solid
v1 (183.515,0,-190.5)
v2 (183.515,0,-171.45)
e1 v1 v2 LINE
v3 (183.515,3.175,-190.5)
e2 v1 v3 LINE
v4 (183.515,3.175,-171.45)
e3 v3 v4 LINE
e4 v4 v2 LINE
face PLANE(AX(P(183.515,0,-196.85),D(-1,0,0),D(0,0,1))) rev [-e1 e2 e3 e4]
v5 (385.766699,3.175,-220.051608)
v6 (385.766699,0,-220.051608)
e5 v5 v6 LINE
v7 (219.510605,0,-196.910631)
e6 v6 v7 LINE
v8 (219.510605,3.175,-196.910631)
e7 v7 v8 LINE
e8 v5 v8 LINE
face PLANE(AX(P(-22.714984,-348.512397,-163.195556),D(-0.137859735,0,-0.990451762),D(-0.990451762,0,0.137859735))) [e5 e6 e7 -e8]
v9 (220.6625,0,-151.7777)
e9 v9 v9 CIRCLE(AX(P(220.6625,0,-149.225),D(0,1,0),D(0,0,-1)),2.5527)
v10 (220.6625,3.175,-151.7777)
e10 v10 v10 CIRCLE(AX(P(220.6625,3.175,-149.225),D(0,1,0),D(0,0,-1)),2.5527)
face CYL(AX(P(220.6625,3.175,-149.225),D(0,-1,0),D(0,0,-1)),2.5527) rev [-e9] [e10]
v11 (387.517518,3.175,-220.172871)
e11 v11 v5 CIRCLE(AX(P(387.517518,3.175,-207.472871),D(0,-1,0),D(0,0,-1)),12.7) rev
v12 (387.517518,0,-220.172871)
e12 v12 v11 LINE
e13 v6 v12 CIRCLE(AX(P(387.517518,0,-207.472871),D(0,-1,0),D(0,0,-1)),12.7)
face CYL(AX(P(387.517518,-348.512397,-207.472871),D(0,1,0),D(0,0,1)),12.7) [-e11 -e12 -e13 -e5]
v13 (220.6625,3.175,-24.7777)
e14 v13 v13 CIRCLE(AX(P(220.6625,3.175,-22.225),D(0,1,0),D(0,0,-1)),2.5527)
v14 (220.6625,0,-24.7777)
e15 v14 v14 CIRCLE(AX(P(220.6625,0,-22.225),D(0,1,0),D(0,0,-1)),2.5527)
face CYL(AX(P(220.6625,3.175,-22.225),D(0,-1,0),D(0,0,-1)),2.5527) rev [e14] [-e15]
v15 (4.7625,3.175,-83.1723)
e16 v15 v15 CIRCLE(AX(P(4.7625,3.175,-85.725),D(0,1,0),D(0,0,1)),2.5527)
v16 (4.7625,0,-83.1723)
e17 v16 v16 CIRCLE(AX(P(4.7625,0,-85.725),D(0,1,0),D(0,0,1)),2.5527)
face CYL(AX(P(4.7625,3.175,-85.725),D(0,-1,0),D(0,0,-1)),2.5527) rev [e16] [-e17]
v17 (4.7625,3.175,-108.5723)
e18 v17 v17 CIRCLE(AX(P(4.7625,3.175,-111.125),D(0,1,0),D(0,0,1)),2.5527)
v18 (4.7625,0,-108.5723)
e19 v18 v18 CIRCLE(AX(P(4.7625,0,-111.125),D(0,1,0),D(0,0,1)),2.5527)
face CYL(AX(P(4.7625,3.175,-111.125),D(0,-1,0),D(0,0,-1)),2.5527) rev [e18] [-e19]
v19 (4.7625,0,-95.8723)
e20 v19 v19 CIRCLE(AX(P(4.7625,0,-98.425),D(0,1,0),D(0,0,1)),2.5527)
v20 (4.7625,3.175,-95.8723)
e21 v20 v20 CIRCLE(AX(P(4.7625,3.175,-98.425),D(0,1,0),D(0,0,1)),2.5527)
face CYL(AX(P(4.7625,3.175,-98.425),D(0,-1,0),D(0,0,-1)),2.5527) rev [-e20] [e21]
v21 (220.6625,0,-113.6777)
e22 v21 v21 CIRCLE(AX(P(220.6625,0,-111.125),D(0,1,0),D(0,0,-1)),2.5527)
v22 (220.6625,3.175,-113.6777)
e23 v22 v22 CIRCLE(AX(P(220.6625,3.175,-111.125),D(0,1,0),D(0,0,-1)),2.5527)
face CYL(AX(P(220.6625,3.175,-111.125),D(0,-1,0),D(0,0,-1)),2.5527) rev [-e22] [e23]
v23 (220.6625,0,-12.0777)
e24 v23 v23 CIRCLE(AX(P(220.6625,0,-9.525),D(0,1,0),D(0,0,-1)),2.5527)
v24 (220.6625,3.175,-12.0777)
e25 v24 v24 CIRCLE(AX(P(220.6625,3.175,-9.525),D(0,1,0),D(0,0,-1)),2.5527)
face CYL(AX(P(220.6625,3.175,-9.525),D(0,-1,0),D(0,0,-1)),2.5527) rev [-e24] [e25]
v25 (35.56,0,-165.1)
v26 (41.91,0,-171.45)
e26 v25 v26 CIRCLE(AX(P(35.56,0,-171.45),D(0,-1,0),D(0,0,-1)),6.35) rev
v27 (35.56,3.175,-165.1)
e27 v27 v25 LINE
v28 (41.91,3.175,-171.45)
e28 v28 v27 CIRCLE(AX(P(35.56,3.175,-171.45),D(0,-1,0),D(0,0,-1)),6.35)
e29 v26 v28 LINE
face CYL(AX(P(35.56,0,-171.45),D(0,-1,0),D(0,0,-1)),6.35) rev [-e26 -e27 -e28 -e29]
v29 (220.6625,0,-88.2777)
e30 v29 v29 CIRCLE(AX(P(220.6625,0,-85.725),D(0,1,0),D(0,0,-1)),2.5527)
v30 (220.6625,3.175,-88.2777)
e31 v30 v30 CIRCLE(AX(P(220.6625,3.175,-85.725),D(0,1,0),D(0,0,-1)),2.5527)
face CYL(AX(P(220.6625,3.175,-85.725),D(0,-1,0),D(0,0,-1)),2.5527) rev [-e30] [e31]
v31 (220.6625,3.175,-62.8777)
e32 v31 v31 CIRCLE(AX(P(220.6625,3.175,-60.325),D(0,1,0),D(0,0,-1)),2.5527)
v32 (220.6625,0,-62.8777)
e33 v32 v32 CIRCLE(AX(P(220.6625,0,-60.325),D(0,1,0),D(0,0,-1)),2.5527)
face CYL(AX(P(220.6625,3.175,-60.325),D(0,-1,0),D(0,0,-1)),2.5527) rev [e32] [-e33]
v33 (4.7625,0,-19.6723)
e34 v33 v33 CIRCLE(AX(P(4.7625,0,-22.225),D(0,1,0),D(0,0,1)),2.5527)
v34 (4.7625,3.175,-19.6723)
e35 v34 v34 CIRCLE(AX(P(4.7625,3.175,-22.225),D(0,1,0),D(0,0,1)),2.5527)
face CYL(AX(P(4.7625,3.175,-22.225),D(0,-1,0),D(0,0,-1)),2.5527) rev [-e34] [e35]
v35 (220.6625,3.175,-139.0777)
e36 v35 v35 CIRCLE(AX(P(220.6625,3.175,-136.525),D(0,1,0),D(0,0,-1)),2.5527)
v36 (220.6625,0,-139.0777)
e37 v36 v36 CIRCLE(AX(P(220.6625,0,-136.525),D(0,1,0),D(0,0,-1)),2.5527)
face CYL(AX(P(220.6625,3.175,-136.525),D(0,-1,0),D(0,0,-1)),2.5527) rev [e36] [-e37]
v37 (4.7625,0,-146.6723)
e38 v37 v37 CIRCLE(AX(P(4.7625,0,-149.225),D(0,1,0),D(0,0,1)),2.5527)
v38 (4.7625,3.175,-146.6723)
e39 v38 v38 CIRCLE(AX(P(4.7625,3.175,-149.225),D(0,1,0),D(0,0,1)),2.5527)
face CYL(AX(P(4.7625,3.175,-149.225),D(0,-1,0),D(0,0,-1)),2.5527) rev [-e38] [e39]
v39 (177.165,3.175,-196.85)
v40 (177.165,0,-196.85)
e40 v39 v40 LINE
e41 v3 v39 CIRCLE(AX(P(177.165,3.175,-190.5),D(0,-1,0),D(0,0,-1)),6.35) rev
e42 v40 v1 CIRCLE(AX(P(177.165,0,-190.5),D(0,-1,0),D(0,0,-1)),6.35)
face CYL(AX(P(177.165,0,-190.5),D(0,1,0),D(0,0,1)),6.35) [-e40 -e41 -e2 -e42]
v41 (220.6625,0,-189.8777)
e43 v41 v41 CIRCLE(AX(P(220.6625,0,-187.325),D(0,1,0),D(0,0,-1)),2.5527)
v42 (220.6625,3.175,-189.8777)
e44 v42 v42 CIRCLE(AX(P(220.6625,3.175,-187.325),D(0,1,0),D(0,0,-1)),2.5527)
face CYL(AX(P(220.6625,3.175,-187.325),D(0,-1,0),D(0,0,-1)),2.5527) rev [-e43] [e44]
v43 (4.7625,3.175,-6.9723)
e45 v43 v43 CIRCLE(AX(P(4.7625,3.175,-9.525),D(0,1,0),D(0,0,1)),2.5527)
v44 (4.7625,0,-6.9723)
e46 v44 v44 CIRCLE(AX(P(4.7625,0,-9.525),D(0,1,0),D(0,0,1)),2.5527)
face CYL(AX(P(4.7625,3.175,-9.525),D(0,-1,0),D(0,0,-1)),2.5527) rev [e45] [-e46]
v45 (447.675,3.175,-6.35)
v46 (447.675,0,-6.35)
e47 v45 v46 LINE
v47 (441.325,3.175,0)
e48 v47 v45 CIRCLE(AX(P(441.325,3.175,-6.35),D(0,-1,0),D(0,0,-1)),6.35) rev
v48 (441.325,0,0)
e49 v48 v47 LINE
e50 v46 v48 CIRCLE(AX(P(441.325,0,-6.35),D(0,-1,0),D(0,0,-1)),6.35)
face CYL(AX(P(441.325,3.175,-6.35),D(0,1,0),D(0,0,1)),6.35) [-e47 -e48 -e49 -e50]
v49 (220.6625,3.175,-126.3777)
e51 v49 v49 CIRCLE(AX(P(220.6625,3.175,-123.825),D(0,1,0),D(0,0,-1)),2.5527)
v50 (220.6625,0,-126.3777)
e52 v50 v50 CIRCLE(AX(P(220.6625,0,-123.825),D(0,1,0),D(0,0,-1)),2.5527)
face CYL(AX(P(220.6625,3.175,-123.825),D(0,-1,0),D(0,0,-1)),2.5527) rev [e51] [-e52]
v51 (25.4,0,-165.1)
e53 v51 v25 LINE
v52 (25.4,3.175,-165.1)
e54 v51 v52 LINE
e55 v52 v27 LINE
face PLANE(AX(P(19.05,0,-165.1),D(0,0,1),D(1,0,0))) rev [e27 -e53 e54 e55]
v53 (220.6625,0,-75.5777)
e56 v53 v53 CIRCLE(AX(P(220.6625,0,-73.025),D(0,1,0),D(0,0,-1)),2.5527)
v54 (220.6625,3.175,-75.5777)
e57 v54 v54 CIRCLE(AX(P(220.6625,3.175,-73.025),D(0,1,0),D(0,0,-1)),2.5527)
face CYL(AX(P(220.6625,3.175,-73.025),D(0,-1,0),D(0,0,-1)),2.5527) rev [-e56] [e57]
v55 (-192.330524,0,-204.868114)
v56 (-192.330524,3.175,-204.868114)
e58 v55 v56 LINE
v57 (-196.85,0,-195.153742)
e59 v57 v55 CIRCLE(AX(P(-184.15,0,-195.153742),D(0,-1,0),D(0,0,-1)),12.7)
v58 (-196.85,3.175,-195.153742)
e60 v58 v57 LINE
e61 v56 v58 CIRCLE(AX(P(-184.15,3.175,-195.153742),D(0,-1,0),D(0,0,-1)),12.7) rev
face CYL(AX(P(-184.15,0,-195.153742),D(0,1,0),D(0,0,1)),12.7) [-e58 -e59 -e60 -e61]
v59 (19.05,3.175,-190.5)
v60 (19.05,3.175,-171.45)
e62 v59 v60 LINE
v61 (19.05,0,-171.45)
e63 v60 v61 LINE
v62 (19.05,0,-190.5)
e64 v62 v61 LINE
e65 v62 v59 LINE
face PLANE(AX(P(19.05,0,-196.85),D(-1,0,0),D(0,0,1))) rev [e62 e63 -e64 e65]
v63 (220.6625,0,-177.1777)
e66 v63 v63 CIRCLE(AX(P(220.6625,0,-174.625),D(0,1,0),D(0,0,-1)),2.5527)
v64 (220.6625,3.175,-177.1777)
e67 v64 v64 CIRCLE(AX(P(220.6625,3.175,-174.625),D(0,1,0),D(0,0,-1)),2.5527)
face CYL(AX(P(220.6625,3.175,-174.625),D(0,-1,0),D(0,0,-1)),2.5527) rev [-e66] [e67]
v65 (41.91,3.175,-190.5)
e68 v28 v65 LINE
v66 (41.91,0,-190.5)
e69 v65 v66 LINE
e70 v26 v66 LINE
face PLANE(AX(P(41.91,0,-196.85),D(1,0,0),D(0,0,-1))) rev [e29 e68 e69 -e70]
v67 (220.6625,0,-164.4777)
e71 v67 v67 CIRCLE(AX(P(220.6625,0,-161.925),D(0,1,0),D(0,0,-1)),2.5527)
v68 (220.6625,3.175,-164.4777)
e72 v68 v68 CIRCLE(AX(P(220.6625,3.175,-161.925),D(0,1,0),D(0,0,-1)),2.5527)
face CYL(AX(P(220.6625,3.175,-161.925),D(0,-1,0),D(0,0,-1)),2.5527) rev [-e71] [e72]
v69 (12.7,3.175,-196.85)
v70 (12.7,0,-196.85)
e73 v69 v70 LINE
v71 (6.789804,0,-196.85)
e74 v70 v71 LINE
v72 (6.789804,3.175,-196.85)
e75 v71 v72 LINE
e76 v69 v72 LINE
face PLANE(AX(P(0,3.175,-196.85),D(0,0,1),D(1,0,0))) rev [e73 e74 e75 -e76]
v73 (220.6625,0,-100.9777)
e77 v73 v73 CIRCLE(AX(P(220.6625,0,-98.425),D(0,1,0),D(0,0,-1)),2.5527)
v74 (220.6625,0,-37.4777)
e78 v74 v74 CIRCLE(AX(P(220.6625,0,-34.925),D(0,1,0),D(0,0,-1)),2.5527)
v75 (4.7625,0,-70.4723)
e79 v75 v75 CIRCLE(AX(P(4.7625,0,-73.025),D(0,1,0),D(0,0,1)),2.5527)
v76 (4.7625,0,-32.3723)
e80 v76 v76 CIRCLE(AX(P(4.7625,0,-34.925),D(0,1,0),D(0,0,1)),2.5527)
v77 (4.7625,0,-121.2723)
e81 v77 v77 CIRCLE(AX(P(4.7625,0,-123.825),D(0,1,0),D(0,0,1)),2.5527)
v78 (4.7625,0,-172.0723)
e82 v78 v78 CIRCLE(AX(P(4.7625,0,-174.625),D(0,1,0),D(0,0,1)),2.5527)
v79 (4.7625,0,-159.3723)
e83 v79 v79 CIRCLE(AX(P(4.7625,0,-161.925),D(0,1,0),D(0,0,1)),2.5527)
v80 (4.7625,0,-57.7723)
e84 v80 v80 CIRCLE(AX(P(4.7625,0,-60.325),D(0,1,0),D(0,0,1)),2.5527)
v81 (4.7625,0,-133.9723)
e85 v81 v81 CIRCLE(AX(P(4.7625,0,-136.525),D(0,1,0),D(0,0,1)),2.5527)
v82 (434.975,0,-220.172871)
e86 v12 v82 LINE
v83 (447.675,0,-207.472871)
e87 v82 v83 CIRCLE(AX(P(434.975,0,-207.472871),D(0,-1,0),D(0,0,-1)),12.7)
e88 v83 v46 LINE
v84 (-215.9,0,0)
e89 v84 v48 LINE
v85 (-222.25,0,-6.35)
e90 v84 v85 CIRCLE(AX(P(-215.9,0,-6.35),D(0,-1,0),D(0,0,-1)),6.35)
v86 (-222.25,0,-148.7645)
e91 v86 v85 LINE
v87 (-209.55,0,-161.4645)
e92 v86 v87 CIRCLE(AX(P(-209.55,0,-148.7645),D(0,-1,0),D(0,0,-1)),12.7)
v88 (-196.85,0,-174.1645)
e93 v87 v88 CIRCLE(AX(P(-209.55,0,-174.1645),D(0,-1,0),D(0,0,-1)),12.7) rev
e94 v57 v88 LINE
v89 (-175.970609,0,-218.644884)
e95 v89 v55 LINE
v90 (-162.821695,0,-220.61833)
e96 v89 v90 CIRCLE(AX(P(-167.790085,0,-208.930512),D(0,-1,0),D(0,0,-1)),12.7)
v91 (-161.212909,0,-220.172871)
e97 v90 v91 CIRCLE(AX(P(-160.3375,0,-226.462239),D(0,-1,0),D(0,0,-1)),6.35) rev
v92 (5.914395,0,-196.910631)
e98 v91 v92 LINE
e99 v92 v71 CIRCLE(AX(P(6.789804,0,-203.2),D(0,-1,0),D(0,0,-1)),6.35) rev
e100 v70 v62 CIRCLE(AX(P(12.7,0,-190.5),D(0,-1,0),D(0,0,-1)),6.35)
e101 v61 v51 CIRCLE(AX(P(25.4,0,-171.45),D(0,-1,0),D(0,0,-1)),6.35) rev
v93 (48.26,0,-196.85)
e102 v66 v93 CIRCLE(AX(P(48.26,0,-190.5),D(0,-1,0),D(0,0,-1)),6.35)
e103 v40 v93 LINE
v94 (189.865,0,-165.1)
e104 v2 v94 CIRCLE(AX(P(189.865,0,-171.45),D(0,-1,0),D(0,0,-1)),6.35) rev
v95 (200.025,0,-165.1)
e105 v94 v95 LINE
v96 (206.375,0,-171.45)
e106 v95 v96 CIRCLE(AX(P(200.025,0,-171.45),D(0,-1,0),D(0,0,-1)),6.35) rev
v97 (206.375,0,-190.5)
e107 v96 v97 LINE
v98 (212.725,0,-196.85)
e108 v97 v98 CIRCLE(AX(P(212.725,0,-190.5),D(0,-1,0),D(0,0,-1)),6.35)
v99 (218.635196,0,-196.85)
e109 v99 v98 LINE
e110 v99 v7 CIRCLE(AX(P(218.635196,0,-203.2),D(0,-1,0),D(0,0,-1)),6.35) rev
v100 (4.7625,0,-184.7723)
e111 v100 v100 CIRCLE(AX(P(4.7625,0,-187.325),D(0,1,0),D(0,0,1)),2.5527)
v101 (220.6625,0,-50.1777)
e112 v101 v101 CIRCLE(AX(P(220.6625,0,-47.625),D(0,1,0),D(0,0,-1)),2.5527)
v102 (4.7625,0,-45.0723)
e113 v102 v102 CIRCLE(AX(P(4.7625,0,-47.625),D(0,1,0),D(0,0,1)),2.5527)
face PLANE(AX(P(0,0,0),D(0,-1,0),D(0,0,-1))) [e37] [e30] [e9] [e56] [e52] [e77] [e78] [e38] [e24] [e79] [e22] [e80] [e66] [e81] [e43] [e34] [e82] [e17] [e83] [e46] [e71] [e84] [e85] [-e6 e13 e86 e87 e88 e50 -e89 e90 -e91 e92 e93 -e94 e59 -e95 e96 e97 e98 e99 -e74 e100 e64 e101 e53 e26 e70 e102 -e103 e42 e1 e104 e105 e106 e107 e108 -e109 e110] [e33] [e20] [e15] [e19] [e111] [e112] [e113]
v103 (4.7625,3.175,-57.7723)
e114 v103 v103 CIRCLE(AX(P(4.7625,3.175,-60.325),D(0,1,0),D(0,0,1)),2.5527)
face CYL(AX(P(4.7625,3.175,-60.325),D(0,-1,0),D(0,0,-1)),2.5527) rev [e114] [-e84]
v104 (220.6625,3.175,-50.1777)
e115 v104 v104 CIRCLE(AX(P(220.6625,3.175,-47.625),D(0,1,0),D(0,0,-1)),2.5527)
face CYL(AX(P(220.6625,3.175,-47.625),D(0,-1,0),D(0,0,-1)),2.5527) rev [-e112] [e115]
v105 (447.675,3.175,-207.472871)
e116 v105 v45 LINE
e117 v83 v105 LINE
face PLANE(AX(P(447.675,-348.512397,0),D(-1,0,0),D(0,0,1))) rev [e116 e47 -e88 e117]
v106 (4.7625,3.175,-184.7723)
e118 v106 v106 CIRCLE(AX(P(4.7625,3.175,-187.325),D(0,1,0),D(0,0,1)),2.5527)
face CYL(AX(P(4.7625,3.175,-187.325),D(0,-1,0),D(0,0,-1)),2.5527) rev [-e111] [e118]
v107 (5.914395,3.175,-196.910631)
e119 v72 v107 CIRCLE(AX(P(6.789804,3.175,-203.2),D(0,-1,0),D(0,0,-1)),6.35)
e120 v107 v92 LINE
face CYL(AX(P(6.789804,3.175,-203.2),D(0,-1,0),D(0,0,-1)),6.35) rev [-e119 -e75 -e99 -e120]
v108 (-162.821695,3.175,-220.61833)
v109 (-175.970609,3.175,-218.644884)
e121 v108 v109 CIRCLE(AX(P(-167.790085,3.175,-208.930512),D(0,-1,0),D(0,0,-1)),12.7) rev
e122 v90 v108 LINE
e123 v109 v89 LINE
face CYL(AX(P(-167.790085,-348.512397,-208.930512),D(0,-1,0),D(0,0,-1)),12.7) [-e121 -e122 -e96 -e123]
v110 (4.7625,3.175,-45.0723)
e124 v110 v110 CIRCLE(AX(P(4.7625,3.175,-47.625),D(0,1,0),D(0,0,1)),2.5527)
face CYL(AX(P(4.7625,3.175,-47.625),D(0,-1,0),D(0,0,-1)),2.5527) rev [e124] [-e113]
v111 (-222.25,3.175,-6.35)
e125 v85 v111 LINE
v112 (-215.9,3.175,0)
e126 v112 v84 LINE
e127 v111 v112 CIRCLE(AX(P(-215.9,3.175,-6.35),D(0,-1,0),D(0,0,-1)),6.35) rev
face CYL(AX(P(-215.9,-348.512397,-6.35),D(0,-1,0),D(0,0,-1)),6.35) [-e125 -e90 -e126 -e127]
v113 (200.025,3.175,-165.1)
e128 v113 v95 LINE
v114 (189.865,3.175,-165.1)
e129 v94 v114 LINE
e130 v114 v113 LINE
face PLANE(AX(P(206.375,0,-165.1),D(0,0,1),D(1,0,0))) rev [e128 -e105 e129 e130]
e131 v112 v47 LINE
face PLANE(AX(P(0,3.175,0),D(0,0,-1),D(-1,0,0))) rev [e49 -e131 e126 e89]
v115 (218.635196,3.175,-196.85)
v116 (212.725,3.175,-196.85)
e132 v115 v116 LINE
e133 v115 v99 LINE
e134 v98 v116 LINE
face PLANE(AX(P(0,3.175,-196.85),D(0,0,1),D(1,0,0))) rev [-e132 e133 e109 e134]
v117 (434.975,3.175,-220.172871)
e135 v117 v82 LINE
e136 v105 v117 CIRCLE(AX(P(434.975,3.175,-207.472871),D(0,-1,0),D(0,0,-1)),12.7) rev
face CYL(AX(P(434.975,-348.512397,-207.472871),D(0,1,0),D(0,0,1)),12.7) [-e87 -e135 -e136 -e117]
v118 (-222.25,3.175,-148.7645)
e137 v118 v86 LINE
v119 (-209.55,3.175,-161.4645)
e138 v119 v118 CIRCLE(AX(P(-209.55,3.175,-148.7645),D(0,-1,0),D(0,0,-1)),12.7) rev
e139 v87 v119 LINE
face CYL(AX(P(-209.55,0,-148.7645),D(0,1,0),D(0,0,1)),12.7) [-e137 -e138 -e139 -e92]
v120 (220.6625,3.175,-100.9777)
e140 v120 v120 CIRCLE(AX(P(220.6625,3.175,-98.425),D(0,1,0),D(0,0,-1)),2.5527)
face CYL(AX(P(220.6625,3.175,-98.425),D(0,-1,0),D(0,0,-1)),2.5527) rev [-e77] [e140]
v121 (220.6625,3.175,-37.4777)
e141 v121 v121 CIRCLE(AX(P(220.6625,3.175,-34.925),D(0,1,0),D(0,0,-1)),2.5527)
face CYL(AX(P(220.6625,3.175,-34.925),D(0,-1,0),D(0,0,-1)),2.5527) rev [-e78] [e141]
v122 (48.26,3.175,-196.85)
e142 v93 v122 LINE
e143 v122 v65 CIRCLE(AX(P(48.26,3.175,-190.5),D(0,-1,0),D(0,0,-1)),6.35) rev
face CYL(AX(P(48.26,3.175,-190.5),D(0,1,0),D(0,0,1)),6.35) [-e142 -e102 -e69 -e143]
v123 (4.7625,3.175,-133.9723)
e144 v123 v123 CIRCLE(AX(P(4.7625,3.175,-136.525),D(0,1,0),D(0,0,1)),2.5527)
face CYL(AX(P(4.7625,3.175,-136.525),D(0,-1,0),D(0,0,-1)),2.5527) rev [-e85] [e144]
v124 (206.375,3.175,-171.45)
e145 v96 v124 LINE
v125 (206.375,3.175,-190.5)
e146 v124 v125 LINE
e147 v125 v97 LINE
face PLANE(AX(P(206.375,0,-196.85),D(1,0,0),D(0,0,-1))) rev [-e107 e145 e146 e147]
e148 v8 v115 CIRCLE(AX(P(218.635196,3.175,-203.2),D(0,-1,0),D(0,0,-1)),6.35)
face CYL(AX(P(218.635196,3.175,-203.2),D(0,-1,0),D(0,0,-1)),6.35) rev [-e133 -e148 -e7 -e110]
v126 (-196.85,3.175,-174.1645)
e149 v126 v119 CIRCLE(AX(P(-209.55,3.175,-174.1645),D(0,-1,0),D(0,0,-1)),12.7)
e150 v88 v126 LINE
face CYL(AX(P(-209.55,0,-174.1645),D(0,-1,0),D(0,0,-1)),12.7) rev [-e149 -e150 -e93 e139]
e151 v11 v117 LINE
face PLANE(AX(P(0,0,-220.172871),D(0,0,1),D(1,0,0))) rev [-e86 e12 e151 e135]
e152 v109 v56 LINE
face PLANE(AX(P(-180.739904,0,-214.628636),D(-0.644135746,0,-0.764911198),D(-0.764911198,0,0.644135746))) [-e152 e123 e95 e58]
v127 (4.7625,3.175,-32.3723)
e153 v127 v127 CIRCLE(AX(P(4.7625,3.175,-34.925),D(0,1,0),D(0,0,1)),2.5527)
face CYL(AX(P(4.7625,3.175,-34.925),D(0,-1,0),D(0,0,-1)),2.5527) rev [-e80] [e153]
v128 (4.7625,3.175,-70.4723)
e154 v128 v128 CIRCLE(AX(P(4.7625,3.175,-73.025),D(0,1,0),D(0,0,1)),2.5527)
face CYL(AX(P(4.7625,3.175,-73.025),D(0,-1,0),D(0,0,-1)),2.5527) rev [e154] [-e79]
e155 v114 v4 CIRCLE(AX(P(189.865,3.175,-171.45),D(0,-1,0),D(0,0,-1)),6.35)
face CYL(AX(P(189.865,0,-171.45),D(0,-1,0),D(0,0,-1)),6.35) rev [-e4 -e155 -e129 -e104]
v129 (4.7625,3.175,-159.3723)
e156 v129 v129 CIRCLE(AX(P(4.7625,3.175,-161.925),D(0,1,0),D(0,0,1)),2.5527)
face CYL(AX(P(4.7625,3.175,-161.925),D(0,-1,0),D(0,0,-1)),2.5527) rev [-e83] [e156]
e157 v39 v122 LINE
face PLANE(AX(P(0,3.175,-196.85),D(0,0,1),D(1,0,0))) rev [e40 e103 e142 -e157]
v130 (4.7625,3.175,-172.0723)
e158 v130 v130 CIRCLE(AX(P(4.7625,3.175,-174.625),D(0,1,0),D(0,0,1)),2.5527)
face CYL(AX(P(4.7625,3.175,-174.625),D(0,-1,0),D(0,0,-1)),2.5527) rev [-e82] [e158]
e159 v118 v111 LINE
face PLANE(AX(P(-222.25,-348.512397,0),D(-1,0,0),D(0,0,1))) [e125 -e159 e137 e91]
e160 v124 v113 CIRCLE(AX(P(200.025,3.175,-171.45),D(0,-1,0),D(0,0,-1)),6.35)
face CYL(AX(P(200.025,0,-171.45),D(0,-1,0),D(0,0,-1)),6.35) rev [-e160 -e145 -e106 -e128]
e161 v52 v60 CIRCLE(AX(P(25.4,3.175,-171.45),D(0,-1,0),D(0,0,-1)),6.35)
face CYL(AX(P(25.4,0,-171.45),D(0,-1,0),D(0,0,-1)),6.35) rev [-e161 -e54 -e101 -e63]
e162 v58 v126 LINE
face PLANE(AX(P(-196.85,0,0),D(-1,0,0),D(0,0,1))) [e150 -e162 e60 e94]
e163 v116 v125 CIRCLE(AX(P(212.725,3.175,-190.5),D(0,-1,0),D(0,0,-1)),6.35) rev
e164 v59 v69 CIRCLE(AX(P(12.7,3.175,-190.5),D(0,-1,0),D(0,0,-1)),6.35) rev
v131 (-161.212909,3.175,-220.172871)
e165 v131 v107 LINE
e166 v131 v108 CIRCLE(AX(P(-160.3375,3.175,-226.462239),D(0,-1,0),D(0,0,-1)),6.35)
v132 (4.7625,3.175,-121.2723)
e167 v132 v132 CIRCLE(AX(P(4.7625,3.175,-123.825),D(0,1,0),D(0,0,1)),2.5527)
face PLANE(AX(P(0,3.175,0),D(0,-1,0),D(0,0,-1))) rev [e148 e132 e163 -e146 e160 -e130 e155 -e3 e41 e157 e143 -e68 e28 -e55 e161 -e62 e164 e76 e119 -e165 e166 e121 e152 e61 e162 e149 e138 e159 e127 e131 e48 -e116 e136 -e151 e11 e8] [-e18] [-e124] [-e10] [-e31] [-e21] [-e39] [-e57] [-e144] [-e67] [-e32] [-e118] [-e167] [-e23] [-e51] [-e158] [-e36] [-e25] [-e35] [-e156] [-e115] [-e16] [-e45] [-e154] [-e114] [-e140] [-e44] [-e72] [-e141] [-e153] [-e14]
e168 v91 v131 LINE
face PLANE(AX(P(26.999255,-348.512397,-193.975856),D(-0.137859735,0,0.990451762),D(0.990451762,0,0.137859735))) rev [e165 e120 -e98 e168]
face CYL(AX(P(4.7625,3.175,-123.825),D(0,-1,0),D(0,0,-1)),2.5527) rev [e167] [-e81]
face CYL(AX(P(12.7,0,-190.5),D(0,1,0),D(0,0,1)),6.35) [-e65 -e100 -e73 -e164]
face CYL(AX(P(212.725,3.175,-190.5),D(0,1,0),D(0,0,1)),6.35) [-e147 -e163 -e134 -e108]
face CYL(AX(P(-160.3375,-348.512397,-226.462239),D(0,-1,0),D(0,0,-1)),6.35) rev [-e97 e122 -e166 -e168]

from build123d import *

# Parameters (mm, degrees)
SKETCH1_W           = 225.425
SKETCH1_H           = 196.85
SKETCH1_R           = 2.5527
BOSS_EXTRUDE1_DEPTH = 3.175
FILLET1_R           = 6.35
SKETCH2_W           = 22.86
SKETCH2_H           = 31.75
CUT_EXTRUDE1_DEPTH  = 300.293223695
FILLET2_R           = 6.35
BOSS_EXTRUDE2_DEPTH = 3.175
FILLET3_R           = 6.35
SKETCH4_R           = 2.4892
CUT_EXTRUDE2_DEPTH  = 520.25515638
CUT_EXTRUDE3_DEPTH  = 520.25515638
FILLET4_R           = 12.7
FILLET5_R           = 12.7
CUT_EXTRUDE4_DEPTH  = 520.25515638
FILLET6_R           = 12.7


with BuildPart() as part:
    # Sketch1 → Boss-Extrude1 (new body)
    with BuildSketch(Plane(origin=(0, 0, 0), x_dir=(1, 0, 0), z_dir=(0, 1, 0))):
        with Locations((112.7125, 98.425)):
            Rectangle(SKETCH1_W, SKETCH1_H)
        with Locations(Location((4.7625, 187.325, 0), (0, 0, 270))):
            Circle(SKETCH1_R, mode=Mode.SUBTRACT)
        with Locations(Location((4.7625, 174.625, 0), (0, 0, 270))):
            Circle(SKETCH1_R, mode=Mode.SUBTRACT)
        with Locations(Location((4.7625, 161.925, 0), (0, 0, 270))):
            Circle(SKETCH1_R, mode=Mode.SUBTRACT)
        with Locations(Location((4.7625, 149.225, 0), (0, 0, 270))):
            Circle(SKETCH1_R, mode=Mode.SUBTRACT)
        with Locations(Location((4.7625, 136.525, 0), (0, 0, 270))):
            Circle(SKETCH1_R, mode=Mode.SUBTRACT)
        with Locations(Location((4.7625, 123.825, 0), (0, 0, 270))):
            Circle(SKETCH1_R, mode=Mode.SUBTRACT)
        with Locations(Location((220.6625, 123.825, 0), (0, 0, 90))):
            Circle(SKETCH1_R, mode=Mode.SUBTRACT)
        with Locations(Location((220.6625, 136.525, 0), (0, 0, 90))):
            Circle(SKETCH1_R, mode=Mode.SUBTRACT)
        with Locations(Location((220.6625, 149.225, 0), (0, 0, 90))):
            Circle(SKETCH1_R, mode=Mode.SUBTRACT)
        with Locations(Location((220.6625, 161.925, 0), (0, 0, 90))):
            Circle(SKETCH1_R, mode=Mode.SUBTRACT)
        with Locations(Location((220.6625, 174.625, 0), (0, 0, 90))):
            Circle(SKETCH1_R, mode=Mode.SUBTRACT)
        with Locations(Location((220.6625, 187.325, 0), (0, 0, 90))):
            Circle(SKETCH1_R, mode=Mode.SUBTRACT)
        with Locations(Location((4.7625, 111.125, 0), (0, 0, 270))):
            Circle(SKETCH1_R, mode=Mode.SUBTRACT)
        with Locations(Location((4.7625, 98.425, 0), (0, 0, 270))):
            Circle(SKETCH1_R, mode=Mode.SUBTRACT)
        with Locations(Location((4.7625, 85.725, 0), (0, 0, 270))):
            Circle(SKETCH1_R, mode=Mode.SUBTRACT)
        with Locations(Location((4.7625, 73.025, 0), (0, 0, 270))):
            Circle(SKETCH1_R, mode=Mode.SUBTRACT)
        with Locations(Location((4.7625, 60.325, 0), (0, 0, 270))):
            Circle(SKETCH1_R, mode=Mode.SUBTRACT)
        with Locations(Location((4.7625, 47.625, 0), (0, 0, 270))):
            Circle(SKETCH1_R, mode=Mode.SUBTRACT)
        with Locations(Location((4.7625, 34.925, 0), (0, 0, 270))):
            Circle(SKETCH1_R, mode=Mode.SUBTRACT)
        with Locations(Location((4.7625, 22.225, 0), (0, 0, 270))):
            Circle(SKETCH1_R, mode=Mode.SUBTRACT)
        with Locations(Location((4.7625, 9.525, 0), (0, 0, 270))):
            Circle(SKETCH1_R, mode=Mode.SUBTRACT)
        with Locations(Location((220.6625, 111.125, 0), (0, 0, 90))):
            Circle(SKETCH1_R, mode=Mode.SUBTRACT)
        with Locations(Location((220.6625, 98.425, 0), (0, 0, 90))):
            Circle(SKETCH1_R, mode=Mode.SUBTRACT)
        with Locations(Location((220.6625, 85.725, 0), (0, 0, 90))):
            Circle(SKETCH1_R, mode=Mode.SUBTRACT)
        with Locations(Location((220.6625, 73.025, 0), (0, 0, 90))):
            Circle(SKETCH1_R, mode=Mode.SUBTRACT)
        with Locations(Location((220.6625, 60.325, 0), (0, 0, 90))):
            Circle(SKETCH1_R, mode=Mode.SUBTRACT)
        with Locations(Location((220.6625, 47.625, 0), (0, 0, 90))):
            Circle(SKETCH1_R, mode=Mode.SUBTRACT)
        with Locations(Location((220.6625, 34.925, 0), (0, 0, 90))):
            Circle(SKETCH1_R, mode=Mode.SUBTRACT)
        with Locations(Location((220.6625, 22.225, 0), (0, 0, 90))):
            Circle(SKETCH1_R, mode=Mode.SUBTRACT)
        with Locations(Location((220.6625, 9.525, 0), (0, 0, 90))):
            Circle(SKETCH1_R, mode=Mode.SUBTRACT)
    extrude(amount=BOSS_EXTRUDE1_DEPTH)

    # Fillet1
    fillet1_edges = [part.edges().sort_by_distance(p)[0] for p in [
        (0, 1.5875, -196.85),
        (225.425, 1.5875, -196.85),
        (225.425, 1.5875, 0),
        (0, 1.5875, 0),
    ]]
    fillet(fillet1_edges, radius=FILLET1_R)

    # Sketch2 → Cut-Extrude1 (cut, through all)
    with BuildSketch(Plane(origin=(0, 3.175, 0), x_dir=(1, 0, 0), z_dir=(0, 1, 0))):
        with Locations((30.48, 180.975)):
            Rectangle(SKETCH2_W, SKETCH2_H)
        with Locations((194.945, 180.975)):
            Rectangle(SKETCH2_W, SKETCH2_H)
    extrude(amount=-CUT_EXTRUDE1_DEPTH, mode=Mode.SUBTRACT)

    # Fillet2
    fillet2_edges = [part.edges().sort_by_distance(p)[0] for p in [
        (19.05, 1.5875, -165.1),
        (19.05, 1.5875, -196.85),
        (41.91, 1.5875, -196.85),
        (41.91, 1.5875, -165.1),
        (183.515, 1.5875, -196.85),
        (206.375, 1.5875, -196.85),
        (206.375, 1.5875, -165.1),
        (183.515, 1.5875, -165.1),
    ]]
    fillet(fillet2_edges, radius=FILLET2_R)

    # Sketch3 → Boss-Extrude2 (add)
    with BuildSketch(Plane(origin=(0, 3.175, 0), x_dir=(1, 0, 0), z_dir=(0, 1, 0))):
        with BuildLine():
            ThreePointArc((0, 6.35), (1.859871939, 1.859871939), (6.35, 0))
            Line((6.35, 0), (-222.25, 0))
            Line((-222.25, 0), (-222.25, 263.064500032))
            Line((-222.25, 263.064500032), (-166.6875, 263.064500032))
            Line((-166.6875, 263.064500032), (-166.6875, 220.934871939))
            Line((-166.6875, 220.934871939), (6.35, 196.85))
            ThreePointArc((6.35, 196.85), (1.859871939, 194.990128061), (0, 190.5))
            Line((0, 190.5), (0, 6.35))
        make_face()
        with BuildLine():
            Line((392.1125, 220.934871939), (219.075, 196.85))
            ThreePointArc((219.075, 196.85), (223.565128061, 194.990128061), (225.425, 190.5))
            Line((225.425, 190.5), (225.425, 6.35))
            ThreePointArc((225.425, 6.35), (223.565128061, 1.859871939), (219.075, 0))
            Line((219.075, 0), (447.675, 0))
            Line((447.675, 0), (447.675, 263.064500032))
            Line((447.675, 263.064500032), (392.1125, 263.064500032))
            Line((392.1125, 263.064500032), (392.1125, 220.934871939))
        make_face()
    extrude(amount=-BOSS_EXTRUDE2_DEPTH)

    # Fillet3
    fillet3_edges = [part.edges().sort_by_distance(p)[0] for p in [
        (219.075, 1.5875, -196.85),
        (6.35, 1.5875, -196.85),
        (-222.25, 1.5875, 0),
        (-222.25, 1.5875, -263.064500032),
        (-166.6875, 1.5875, -263.064500032),
        (-166.6875, 1.5875, -220.934871939),
        (447.675, 1.5875, 0),
        (447.675, 1.5875, -263.064500032),
        (392.1125, 1.5875, -263.064500032),
        (392.1125, 1.5875, -220.934871939),
    ]]
    fillet(fillet3_edges, radius=FILLET3_R)

    # Sketch4 → Cut-Extrude2 (cut, through all)
    with BuildSketch(Plane(origin=(0, 3.175, 0), x_dir=(1, 0, 0), z_dir=(0, 1, 0))):
        with Locations(Location((-211.1375, 256.714500032, 0), (0, 0, 270))):
            Circle(SKETCH4_R)
        with Locations((-223.8375, 256.714500032)):
            Circle(SKETCH4_R)
        with Locations(Location((-198.4375, 256.714500032, 0), (0, 0, 270))):
            Circle(SKETCH4_R)
        with Locations(Location((-185.7375, 256.714500032, 0), (0, 0, 270))):
            Circle(SKETCH4_R)
        with Locations(Location((411.1625, 256.714500032, 0), (0, 0, 270))):
            Circle(SKETCH4_R)
        with Locations(Location((423.8625, 256.714500032, 0), (0, 0, 270))):
            Circle(SKETCH4_R)
        with Locations(Location((436.5625, 256.714500032, 0), (0, 0, 270))):
            Circle(SKETCH4_R)
        with Locations((449.2625, 256.714500032)):
            Circle(SKETCH4_R)
    extrude(amount=-CUT_EXTRUDE2_DEPTH, mode=Mode.SUBTRACT)

    # Sketch5 → Cut-Extrude3 (cut, through all)
    with BuildSketch(Plane(origin=(0, 3.175, 0), x_dir=(1, 0, 0), z_dir=(0, 1, 0))):
        with BuildLine():
            Line((-196.85, 201.06223924), (-166.6875, 226.46223924))
            Line((-166.6875, 226.46223924), (-166.6875, 256.714500032))
            ThreePointArc((-166.6875, 256.714500032), (-168.547371939, 261.204628093), (-173.0375, 263.064500032))
            Line((-173.0375, 263.064500032), (-215.9, 263.064500032))
            ThreePointArc((-215.9, 263.064500032), (-219.742708963, 261.769802973), (-222.01844344, 258.413661552))
            ThreePointArc((-222.01844344, 258.413661552), (-221.353386843, 256.55544512), (-222.25, 254.797220608))
            Line((-222.25, 254.797220608), (-222.25, 161.464500032))
            Line((-222.25, 161.464500032), (-196.85, 161.464500032))
            Line((-196.85, 161.464500032), (-196.85, 201.06223924))
        make_face()
    extrude(amount=-CUT_EXTRUDE3_DEPTH, mode=Mode.SUBTRACT)

    # Fillet4
    fillet4_edges = [part.edges().sort_by_distance(p)[0] for p in [
        (-166.6875, 1.5875, -226.46223924),
    ]]
    fillet(fillet4_edges, radius=FILLET4_R)

    # Fillet5
    # the kernel refuses this fillet: 12.7 mm, written as the material it adds along each edge
    with BuildSketch(Plane(origin=(-196.85, 3.175, -161.464500032), x_dir=(0, 0, -1), z_dir=(0, -1, 0))) as fillet5_piece_1:
        with BuildLine():
            CenterArc((FILLET5_R, -FILLET5_R), FILLET5_R, 90, 90)
            Line((0, -FILLET5_R), (0, 0))
            Line((0, 0), (FILLET5_R, 0))
        make_face()
    extrude(amount=3.175)
    # the kernel refuses this fillet: 12.7 mm, written as the material it takes off along each edge
    with BuildSketch(Plane(origin=(-196.85, 17.946244164, -201.06223924), x_dir=(0.7649111981170551, 0, -0.6441357457827745), z_dir=(0, -1, 0))) as fillet5_2_piece_1:
        with BuildLine():
            CenterArc((FILLET5_R * 0.465236036671, FILLET5_R), FILLET5_R, 220.100907546, 49.899092454)
            Line((-FILLET5_R * 0.299675161446, FILLET5_R * 0.355864254217), (0, 0))
            Line((0, 0), (FILLET5_R * 0.465236036671, 0))
        make_face()
    extrude(amount=32.717488329, mode=Mode.SUBTRACT)
    with BuildSketch(Plane(origin=(447.675, -8.095541775, -254.797220608), x_dir=(0, 0, 1), z_dir=(0, 1, 0))) as fillet5_2_piece_2:
        with BuildLine():
            CenterArc((3.23821671, -12.7), FILLET5_R, 90, 19.84145254)
            ThreePointArc((-1.072398787, -0.753929766), (-0.485677324, -0.448828084), (0, 0))
            Line((0, 0), (3.23821671, 0))
        make_face()
    extrude(amount=19.366083551, mode=Mode.SUBTRACT)
    with BuildSketch(Plane(origin=(447.44344344, 35.300659999, -258.413661552), x_dir=(-0.15933009904397483, 0, 0.987225364108235), z_dir=(0, -1, 0))) as fillet5_2_piece_3:
        with BuildLine():
            CenterArc((9.854968596, 10.543603817), FILLET5_R, 170.831985075, 65.287819707)
            Line((-2.682793528, 12.567096075), (-3.936569741, 12.7694453))
            ThreePointArc((-3.936569741, 12.7694453), (-4.870349725, 6.983650334), (-0.53046151, -1.153910996))
            Line((-0.53046151, -1.153910996), (0.707971882, -1.054360382))
            ThreePointArc((0.707971882, -1.054360382), (1.387624889, -0.847346348), (2.067277895, -1.054360382))
            Line((2.067277895, -1.054360382), (2.775249777, 0))
        make_face()
    extrude(amount=67.426319998, mode=Mode.SUBTRACT)
    with BuildSketch(Plane(origin=(-222.25, 34.925, -161.464500032), x_dir=(1, 0, 0), z_dir=(0, -1, 0))) as fillet5_2_piece_4:
        with BuildLine():
            CenterArc((FILLET5_R, FILLET5_R), FILLET5_R, 180, 90)
            Line((0, FILLET5_R), (0, 0))
            Line((0, 0), (FILLET5_R, 0))
        make_face()
    extrude(amount=66.675, mode=Mode.SUBTRACT)

    # Sketch6 → Cut-Extrude4 (cut, through all)
    with BuildSketch(Plane(origin=(0, 3.175, 0), x_dir=(1, 0, 0), z_dir=(0, 1, 0))):
        with BuildLine():
            ThreePointArc((392.1125, 226.46223924), (390.552142427, 222.293087597), (386.637909316, 220.172870549))
            Line((386.637909316, 220.172870549), (447.675, 220.172870549))
            Line((447.675, 220.172870549), (447.675, 251.559003898))
            ThreePointArc((447.675, 251.559003898), (447.494110467, 253.694858088), (446.956594784, 255.769869181))
            ThreePointArc((446.956594784, 255.769869181), (442.270283564, 261.086864235), (435.464337201, 263.064500032))
            Line((435.464337201, 263.064500032), (398.4625, 263.064500032))
            ThreePointArc((398.4625, 263.064500032), (393.972371939, 261.204628093), (392.1125, 256.714500032))
            Line((392.1125, 256.714500032), (392.1125, 226.46223924))
        make_face()
    extrude(amount=-CUT_EXTRUDE4_DEPTH, mode=Mode.SUBTRACT)

    # Fillet6
    fillet6_edges = [part.edges().sort_by_distance(p)[0] for p in [
        (386.637909316, 1.5875, -220.172870549),
        (447.675, 1.5875, -220.172870549),
    ]]
    fillet(fillet6_edges, radius=FILLET6_R)


solid = part.part
